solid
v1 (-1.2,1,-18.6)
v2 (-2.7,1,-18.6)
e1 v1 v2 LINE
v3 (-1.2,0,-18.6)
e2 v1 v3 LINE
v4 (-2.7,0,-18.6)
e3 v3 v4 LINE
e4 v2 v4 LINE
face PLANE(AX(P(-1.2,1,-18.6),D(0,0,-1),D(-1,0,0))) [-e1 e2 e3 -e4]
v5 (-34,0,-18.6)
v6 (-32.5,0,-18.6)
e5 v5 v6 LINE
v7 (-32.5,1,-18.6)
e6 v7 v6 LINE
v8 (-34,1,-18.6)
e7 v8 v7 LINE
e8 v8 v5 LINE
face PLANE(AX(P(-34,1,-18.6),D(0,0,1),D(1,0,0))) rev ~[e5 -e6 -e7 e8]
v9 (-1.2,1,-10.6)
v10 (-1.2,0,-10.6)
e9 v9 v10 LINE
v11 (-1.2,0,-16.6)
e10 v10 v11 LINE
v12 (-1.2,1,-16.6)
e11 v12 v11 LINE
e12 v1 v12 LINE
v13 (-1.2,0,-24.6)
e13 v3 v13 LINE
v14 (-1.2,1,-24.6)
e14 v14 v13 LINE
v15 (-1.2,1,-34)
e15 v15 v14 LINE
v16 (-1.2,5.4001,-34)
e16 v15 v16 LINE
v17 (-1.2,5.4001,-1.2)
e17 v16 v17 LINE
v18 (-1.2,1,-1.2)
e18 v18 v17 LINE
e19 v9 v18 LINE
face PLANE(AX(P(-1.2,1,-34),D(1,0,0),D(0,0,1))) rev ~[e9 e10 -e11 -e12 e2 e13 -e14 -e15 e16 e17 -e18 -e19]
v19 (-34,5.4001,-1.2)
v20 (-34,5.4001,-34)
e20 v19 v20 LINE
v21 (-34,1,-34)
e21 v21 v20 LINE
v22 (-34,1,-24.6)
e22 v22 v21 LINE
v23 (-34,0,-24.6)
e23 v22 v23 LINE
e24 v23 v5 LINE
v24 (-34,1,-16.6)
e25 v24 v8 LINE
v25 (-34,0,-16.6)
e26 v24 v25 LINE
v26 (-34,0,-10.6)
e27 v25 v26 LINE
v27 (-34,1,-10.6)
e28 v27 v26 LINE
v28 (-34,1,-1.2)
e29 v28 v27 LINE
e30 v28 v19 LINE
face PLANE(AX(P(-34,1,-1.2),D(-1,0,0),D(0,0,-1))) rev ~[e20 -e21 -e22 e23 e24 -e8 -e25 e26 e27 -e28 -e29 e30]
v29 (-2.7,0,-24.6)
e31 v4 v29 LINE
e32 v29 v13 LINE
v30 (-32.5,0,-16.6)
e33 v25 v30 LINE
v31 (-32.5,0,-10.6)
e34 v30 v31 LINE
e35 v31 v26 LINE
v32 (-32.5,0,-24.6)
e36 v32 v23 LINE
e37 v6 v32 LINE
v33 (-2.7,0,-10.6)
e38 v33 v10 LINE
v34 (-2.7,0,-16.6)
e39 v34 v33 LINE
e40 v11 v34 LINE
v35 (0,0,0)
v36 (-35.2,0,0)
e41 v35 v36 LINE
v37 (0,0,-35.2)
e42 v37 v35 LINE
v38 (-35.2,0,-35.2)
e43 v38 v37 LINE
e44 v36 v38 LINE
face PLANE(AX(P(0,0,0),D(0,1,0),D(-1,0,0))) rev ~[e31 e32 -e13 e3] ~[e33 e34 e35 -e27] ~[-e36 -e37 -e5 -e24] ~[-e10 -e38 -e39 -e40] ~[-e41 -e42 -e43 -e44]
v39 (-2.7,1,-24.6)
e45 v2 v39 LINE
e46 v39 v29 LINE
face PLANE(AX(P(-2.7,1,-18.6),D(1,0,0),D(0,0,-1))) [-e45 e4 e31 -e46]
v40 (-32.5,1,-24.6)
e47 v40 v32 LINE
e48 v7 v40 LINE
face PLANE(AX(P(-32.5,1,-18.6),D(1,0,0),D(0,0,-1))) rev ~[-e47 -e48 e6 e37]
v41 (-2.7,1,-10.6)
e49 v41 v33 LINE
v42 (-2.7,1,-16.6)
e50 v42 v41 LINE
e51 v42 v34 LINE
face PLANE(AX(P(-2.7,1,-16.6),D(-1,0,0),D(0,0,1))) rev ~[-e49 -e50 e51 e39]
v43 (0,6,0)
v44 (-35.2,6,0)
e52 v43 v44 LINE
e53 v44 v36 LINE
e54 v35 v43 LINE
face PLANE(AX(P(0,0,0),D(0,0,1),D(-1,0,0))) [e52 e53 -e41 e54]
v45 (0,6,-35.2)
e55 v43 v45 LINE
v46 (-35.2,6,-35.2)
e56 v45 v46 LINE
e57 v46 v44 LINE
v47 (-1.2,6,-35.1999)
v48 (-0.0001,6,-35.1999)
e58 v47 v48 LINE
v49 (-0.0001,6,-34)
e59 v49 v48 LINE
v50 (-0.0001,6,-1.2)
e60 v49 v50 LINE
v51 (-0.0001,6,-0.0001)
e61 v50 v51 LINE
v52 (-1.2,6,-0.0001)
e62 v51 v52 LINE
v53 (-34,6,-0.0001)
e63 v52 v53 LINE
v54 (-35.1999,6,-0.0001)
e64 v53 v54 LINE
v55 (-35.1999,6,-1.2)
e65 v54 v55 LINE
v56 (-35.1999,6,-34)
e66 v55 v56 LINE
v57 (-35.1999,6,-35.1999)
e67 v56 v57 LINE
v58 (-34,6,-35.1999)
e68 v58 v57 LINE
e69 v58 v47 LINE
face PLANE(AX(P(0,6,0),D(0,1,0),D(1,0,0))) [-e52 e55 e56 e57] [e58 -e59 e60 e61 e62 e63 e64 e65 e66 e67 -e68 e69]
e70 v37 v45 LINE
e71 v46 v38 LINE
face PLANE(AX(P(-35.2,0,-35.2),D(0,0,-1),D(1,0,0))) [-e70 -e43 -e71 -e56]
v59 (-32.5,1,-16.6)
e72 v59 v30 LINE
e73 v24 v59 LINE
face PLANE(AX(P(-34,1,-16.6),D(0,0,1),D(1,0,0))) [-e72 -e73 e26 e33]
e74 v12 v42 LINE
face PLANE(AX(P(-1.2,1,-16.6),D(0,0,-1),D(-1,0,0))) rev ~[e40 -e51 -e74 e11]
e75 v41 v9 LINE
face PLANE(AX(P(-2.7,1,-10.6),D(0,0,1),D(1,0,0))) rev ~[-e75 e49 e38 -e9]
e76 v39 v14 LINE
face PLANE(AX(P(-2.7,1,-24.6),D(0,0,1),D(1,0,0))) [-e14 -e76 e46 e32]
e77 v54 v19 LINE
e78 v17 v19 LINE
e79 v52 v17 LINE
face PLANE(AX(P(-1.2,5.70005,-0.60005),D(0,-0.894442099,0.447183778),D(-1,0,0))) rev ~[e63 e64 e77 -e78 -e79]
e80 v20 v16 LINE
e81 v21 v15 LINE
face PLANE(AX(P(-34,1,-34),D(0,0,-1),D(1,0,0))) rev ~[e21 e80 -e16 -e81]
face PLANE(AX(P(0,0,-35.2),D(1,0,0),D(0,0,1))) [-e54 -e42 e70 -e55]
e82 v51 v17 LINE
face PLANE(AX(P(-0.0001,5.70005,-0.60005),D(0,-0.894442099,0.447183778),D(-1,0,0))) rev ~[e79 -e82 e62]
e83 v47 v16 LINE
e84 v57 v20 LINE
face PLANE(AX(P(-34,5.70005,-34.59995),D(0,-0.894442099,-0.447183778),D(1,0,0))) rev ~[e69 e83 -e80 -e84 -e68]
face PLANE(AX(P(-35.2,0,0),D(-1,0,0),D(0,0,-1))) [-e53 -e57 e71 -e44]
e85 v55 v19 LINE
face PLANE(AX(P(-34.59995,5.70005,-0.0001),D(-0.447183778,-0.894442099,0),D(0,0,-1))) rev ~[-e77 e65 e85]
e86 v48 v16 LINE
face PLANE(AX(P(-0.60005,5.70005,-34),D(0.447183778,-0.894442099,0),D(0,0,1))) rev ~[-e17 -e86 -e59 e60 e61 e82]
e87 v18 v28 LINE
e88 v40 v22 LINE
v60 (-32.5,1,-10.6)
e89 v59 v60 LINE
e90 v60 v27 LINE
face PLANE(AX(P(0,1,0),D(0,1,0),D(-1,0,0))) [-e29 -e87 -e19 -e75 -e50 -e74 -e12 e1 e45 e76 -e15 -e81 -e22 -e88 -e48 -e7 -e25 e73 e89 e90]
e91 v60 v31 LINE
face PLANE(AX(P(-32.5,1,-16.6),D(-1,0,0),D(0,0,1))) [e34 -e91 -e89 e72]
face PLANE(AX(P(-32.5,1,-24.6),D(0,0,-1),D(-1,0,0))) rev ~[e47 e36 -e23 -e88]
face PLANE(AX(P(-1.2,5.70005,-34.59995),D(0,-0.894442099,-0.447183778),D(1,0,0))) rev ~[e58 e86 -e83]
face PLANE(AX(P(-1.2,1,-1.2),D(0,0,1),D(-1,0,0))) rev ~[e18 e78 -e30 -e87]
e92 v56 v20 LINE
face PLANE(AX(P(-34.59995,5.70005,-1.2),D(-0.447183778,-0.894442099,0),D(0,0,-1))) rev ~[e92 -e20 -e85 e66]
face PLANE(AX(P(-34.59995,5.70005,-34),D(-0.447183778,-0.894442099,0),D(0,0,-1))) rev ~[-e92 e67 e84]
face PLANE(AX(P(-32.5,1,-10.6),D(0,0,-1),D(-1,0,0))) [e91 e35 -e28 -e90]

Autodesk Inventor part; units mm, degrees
ref_plane "YZ Plane" through (0, 0, 0) normal (1, 0, 0) x (0, 1, 0)
ref_plane "XZ Plane" through (0, 0, 0) normal (0, 1, 0) x (-1, 0, 0)
ref_plane "XY Plane" through (0, 0, 0) normal (0, 0, 1) x (1, 0, 0)
sketch "Sketch1" plane through (0, 0, 0) normal (0, 1, 0) x (-1, 0, 0)
  point P0 (0, 0)
sketch "Sketch2" plane through (0, 0, 0) normal (0, 1, 0) x (-1, 0, 0)
  line L0 (0, 0) -> (35.2, 0)
  line L1 (35.2, 0) -> (35.2, -35.2)
  line L2 (35.2, -35.2) -> (0, -35.2)
  line L3 (0, -35.2) -> (0, 0)
  dimension "d0" = 35.2
  dimension "d1" = 35.2
extrude "Extrusion1" add sketch "Sketch2" along normal blind 1
sketch "Sketch3" plane through (0, 1, 0) normal (0, 1, 0) x (1, 0, 0)
  line L0 (0, 35.2) -> (-35.2, 35.2) projected
  line L1 (-35.2, 35.2) -> (-35.2, 0) projected
  line L2 (-35.2, 0) -> (0, 0) projected
  line L3 (0, 0) -> (0, 35.2) projected
  line L4 (-35.2, 0) -> (0, 0) projected
  line L5 (0, 0) -> (-1.2, 0)
  line L6 (-1.2, 0) -> (-1.2, 1.2)
  line L7 (-1.2, 1.2) -> (-34, 1.2)
  line L8 (-34, 1.2) -> (-34, 34)
  line L9 (-34, 34) -> (-1.2, 34)
  line L10 (-1.2, 34) -> (-1.2, 1.2)
  dimension "d4" = 1.2
  dimension "d5" = 1.2
  dimension "d6" = 32.8
  dimension "d7" = 32.8
extrude "Extrusion2" add sketch "Sketch3" along normal blind 5
sketch "Sketch4" plane through (0, 1, 0) normal (0, 1, 0) x (1, 0, 0)
  line L0 (-1.2, 1.2) -> (-1.2, 34) projected
  line L1 (-1.2, 34) -> (-34, 34) projected
  line L2 (-34, 34) -> (-34, 1.2) projected
  line L3 (-34, 1.2) -> (-1.2, 1.2) projected
  line L4 (-1.2, 1.2) -> (-1.2, 34) projected
  line L5 (-1.2, 17.6) -> (-34, 17.6)
  line L6 (-34, 34) -> (-1.2, 34) projected
  line L7 (-17.6, 34) -> (-17.6, 1.2)
  line L8 (-17.6, 17.6) -> (-17.6, 18.6)
  line L9 (-34, 17.6) -> (-34, 17.6)
  line L10 (-34, 1.2) -> (-34, 34) projected
  line L11 (-34, 17.6) -> (-32.5, 17.6)
  line L12 (-1.2, 17.6) -> (-1.2, 18.6)
  line L13 (-1.2, 18.6) -> (-2.7, 18.6)
  line L14 (-2.7, 18.6) -> (-2.7, 24.6)
  line L15 (-2.7, 24.6) -> (-1.2, 24.6)
  line L16 (-1.2, 17.6) -> (-1.2, 15.6)
  line L17 (-1.2, 17.6) -> (-1.2, 16.6)
  line L18 (-1.2, 34) -> (-1.2, 1.2) projected
  line L19 (-1.2, 16.6) -> (-2.7, 16.6)
  line L20 (-2.7, 16.6) -> (-2.7, 10.6)
  line L21 (-2.7, 10.6) -> (-1.2, 10.6)
  line L22 (-34, 17.6) -> (-34, 18.6)
  line L23 (-34, 1.2) -> (-34, 34) projected
  line L24 (-34, 18.6) -> (-32.5, 18.6)
  line L25 (-32.5, 18.6) -> (-32.5, 24.6)
  line L26 (-32.5, 24.6) -> (-34, 24.6)
  line L27 (-34, 17.6) -> (-34, 16.6)
  line L28 (-34, 16.6) -> (-32.5, 16.6)
  line L29 (-32.5, 16.6) -> (-32.5, 10.6)
  line L30 (-32.5, 10.6) -> (-34, 10.6)
  point P0 (0, 0)
  point P1 (-34, 23.6)
  dimension "d13" = 1
  dimension "d19" = 1.5
  dimension "d20" = 6
  dimension "d49" = 6
extrude "Extrusion3" cut sketch "Sketch4" against normal blind 4 contours L21 L20 L19 L0 | L2 L28 L29 L30 | L13 L14 L15 L0 | L2 L26 L25 L24
chamfer "Chamfer3" distance 1.2 distance2 0.6 1 edges at (-1.2, 6, -17.6) measured on face at (-34.8, 6, -23.0667)
chamfer "Chamfer4" distance 1.2 distance2 0.6 1 edges at (-17.6, 6, -1.2) measured on face at (-34.8, 6, -23.0667)
chamfer "Chamfer5" distance 1.2 distance2 0.6 1 edges at (-17.6, 6, -34) measured on face at (-34.8, 6, -23.0667)
chamfer "Chamfer6" distance 1.2 distance2 0.6 1 edges at (-34, 6, -17.6) measured on face at (-34.8, 6, -23.0667)
properties part number "led-compartment-2"
